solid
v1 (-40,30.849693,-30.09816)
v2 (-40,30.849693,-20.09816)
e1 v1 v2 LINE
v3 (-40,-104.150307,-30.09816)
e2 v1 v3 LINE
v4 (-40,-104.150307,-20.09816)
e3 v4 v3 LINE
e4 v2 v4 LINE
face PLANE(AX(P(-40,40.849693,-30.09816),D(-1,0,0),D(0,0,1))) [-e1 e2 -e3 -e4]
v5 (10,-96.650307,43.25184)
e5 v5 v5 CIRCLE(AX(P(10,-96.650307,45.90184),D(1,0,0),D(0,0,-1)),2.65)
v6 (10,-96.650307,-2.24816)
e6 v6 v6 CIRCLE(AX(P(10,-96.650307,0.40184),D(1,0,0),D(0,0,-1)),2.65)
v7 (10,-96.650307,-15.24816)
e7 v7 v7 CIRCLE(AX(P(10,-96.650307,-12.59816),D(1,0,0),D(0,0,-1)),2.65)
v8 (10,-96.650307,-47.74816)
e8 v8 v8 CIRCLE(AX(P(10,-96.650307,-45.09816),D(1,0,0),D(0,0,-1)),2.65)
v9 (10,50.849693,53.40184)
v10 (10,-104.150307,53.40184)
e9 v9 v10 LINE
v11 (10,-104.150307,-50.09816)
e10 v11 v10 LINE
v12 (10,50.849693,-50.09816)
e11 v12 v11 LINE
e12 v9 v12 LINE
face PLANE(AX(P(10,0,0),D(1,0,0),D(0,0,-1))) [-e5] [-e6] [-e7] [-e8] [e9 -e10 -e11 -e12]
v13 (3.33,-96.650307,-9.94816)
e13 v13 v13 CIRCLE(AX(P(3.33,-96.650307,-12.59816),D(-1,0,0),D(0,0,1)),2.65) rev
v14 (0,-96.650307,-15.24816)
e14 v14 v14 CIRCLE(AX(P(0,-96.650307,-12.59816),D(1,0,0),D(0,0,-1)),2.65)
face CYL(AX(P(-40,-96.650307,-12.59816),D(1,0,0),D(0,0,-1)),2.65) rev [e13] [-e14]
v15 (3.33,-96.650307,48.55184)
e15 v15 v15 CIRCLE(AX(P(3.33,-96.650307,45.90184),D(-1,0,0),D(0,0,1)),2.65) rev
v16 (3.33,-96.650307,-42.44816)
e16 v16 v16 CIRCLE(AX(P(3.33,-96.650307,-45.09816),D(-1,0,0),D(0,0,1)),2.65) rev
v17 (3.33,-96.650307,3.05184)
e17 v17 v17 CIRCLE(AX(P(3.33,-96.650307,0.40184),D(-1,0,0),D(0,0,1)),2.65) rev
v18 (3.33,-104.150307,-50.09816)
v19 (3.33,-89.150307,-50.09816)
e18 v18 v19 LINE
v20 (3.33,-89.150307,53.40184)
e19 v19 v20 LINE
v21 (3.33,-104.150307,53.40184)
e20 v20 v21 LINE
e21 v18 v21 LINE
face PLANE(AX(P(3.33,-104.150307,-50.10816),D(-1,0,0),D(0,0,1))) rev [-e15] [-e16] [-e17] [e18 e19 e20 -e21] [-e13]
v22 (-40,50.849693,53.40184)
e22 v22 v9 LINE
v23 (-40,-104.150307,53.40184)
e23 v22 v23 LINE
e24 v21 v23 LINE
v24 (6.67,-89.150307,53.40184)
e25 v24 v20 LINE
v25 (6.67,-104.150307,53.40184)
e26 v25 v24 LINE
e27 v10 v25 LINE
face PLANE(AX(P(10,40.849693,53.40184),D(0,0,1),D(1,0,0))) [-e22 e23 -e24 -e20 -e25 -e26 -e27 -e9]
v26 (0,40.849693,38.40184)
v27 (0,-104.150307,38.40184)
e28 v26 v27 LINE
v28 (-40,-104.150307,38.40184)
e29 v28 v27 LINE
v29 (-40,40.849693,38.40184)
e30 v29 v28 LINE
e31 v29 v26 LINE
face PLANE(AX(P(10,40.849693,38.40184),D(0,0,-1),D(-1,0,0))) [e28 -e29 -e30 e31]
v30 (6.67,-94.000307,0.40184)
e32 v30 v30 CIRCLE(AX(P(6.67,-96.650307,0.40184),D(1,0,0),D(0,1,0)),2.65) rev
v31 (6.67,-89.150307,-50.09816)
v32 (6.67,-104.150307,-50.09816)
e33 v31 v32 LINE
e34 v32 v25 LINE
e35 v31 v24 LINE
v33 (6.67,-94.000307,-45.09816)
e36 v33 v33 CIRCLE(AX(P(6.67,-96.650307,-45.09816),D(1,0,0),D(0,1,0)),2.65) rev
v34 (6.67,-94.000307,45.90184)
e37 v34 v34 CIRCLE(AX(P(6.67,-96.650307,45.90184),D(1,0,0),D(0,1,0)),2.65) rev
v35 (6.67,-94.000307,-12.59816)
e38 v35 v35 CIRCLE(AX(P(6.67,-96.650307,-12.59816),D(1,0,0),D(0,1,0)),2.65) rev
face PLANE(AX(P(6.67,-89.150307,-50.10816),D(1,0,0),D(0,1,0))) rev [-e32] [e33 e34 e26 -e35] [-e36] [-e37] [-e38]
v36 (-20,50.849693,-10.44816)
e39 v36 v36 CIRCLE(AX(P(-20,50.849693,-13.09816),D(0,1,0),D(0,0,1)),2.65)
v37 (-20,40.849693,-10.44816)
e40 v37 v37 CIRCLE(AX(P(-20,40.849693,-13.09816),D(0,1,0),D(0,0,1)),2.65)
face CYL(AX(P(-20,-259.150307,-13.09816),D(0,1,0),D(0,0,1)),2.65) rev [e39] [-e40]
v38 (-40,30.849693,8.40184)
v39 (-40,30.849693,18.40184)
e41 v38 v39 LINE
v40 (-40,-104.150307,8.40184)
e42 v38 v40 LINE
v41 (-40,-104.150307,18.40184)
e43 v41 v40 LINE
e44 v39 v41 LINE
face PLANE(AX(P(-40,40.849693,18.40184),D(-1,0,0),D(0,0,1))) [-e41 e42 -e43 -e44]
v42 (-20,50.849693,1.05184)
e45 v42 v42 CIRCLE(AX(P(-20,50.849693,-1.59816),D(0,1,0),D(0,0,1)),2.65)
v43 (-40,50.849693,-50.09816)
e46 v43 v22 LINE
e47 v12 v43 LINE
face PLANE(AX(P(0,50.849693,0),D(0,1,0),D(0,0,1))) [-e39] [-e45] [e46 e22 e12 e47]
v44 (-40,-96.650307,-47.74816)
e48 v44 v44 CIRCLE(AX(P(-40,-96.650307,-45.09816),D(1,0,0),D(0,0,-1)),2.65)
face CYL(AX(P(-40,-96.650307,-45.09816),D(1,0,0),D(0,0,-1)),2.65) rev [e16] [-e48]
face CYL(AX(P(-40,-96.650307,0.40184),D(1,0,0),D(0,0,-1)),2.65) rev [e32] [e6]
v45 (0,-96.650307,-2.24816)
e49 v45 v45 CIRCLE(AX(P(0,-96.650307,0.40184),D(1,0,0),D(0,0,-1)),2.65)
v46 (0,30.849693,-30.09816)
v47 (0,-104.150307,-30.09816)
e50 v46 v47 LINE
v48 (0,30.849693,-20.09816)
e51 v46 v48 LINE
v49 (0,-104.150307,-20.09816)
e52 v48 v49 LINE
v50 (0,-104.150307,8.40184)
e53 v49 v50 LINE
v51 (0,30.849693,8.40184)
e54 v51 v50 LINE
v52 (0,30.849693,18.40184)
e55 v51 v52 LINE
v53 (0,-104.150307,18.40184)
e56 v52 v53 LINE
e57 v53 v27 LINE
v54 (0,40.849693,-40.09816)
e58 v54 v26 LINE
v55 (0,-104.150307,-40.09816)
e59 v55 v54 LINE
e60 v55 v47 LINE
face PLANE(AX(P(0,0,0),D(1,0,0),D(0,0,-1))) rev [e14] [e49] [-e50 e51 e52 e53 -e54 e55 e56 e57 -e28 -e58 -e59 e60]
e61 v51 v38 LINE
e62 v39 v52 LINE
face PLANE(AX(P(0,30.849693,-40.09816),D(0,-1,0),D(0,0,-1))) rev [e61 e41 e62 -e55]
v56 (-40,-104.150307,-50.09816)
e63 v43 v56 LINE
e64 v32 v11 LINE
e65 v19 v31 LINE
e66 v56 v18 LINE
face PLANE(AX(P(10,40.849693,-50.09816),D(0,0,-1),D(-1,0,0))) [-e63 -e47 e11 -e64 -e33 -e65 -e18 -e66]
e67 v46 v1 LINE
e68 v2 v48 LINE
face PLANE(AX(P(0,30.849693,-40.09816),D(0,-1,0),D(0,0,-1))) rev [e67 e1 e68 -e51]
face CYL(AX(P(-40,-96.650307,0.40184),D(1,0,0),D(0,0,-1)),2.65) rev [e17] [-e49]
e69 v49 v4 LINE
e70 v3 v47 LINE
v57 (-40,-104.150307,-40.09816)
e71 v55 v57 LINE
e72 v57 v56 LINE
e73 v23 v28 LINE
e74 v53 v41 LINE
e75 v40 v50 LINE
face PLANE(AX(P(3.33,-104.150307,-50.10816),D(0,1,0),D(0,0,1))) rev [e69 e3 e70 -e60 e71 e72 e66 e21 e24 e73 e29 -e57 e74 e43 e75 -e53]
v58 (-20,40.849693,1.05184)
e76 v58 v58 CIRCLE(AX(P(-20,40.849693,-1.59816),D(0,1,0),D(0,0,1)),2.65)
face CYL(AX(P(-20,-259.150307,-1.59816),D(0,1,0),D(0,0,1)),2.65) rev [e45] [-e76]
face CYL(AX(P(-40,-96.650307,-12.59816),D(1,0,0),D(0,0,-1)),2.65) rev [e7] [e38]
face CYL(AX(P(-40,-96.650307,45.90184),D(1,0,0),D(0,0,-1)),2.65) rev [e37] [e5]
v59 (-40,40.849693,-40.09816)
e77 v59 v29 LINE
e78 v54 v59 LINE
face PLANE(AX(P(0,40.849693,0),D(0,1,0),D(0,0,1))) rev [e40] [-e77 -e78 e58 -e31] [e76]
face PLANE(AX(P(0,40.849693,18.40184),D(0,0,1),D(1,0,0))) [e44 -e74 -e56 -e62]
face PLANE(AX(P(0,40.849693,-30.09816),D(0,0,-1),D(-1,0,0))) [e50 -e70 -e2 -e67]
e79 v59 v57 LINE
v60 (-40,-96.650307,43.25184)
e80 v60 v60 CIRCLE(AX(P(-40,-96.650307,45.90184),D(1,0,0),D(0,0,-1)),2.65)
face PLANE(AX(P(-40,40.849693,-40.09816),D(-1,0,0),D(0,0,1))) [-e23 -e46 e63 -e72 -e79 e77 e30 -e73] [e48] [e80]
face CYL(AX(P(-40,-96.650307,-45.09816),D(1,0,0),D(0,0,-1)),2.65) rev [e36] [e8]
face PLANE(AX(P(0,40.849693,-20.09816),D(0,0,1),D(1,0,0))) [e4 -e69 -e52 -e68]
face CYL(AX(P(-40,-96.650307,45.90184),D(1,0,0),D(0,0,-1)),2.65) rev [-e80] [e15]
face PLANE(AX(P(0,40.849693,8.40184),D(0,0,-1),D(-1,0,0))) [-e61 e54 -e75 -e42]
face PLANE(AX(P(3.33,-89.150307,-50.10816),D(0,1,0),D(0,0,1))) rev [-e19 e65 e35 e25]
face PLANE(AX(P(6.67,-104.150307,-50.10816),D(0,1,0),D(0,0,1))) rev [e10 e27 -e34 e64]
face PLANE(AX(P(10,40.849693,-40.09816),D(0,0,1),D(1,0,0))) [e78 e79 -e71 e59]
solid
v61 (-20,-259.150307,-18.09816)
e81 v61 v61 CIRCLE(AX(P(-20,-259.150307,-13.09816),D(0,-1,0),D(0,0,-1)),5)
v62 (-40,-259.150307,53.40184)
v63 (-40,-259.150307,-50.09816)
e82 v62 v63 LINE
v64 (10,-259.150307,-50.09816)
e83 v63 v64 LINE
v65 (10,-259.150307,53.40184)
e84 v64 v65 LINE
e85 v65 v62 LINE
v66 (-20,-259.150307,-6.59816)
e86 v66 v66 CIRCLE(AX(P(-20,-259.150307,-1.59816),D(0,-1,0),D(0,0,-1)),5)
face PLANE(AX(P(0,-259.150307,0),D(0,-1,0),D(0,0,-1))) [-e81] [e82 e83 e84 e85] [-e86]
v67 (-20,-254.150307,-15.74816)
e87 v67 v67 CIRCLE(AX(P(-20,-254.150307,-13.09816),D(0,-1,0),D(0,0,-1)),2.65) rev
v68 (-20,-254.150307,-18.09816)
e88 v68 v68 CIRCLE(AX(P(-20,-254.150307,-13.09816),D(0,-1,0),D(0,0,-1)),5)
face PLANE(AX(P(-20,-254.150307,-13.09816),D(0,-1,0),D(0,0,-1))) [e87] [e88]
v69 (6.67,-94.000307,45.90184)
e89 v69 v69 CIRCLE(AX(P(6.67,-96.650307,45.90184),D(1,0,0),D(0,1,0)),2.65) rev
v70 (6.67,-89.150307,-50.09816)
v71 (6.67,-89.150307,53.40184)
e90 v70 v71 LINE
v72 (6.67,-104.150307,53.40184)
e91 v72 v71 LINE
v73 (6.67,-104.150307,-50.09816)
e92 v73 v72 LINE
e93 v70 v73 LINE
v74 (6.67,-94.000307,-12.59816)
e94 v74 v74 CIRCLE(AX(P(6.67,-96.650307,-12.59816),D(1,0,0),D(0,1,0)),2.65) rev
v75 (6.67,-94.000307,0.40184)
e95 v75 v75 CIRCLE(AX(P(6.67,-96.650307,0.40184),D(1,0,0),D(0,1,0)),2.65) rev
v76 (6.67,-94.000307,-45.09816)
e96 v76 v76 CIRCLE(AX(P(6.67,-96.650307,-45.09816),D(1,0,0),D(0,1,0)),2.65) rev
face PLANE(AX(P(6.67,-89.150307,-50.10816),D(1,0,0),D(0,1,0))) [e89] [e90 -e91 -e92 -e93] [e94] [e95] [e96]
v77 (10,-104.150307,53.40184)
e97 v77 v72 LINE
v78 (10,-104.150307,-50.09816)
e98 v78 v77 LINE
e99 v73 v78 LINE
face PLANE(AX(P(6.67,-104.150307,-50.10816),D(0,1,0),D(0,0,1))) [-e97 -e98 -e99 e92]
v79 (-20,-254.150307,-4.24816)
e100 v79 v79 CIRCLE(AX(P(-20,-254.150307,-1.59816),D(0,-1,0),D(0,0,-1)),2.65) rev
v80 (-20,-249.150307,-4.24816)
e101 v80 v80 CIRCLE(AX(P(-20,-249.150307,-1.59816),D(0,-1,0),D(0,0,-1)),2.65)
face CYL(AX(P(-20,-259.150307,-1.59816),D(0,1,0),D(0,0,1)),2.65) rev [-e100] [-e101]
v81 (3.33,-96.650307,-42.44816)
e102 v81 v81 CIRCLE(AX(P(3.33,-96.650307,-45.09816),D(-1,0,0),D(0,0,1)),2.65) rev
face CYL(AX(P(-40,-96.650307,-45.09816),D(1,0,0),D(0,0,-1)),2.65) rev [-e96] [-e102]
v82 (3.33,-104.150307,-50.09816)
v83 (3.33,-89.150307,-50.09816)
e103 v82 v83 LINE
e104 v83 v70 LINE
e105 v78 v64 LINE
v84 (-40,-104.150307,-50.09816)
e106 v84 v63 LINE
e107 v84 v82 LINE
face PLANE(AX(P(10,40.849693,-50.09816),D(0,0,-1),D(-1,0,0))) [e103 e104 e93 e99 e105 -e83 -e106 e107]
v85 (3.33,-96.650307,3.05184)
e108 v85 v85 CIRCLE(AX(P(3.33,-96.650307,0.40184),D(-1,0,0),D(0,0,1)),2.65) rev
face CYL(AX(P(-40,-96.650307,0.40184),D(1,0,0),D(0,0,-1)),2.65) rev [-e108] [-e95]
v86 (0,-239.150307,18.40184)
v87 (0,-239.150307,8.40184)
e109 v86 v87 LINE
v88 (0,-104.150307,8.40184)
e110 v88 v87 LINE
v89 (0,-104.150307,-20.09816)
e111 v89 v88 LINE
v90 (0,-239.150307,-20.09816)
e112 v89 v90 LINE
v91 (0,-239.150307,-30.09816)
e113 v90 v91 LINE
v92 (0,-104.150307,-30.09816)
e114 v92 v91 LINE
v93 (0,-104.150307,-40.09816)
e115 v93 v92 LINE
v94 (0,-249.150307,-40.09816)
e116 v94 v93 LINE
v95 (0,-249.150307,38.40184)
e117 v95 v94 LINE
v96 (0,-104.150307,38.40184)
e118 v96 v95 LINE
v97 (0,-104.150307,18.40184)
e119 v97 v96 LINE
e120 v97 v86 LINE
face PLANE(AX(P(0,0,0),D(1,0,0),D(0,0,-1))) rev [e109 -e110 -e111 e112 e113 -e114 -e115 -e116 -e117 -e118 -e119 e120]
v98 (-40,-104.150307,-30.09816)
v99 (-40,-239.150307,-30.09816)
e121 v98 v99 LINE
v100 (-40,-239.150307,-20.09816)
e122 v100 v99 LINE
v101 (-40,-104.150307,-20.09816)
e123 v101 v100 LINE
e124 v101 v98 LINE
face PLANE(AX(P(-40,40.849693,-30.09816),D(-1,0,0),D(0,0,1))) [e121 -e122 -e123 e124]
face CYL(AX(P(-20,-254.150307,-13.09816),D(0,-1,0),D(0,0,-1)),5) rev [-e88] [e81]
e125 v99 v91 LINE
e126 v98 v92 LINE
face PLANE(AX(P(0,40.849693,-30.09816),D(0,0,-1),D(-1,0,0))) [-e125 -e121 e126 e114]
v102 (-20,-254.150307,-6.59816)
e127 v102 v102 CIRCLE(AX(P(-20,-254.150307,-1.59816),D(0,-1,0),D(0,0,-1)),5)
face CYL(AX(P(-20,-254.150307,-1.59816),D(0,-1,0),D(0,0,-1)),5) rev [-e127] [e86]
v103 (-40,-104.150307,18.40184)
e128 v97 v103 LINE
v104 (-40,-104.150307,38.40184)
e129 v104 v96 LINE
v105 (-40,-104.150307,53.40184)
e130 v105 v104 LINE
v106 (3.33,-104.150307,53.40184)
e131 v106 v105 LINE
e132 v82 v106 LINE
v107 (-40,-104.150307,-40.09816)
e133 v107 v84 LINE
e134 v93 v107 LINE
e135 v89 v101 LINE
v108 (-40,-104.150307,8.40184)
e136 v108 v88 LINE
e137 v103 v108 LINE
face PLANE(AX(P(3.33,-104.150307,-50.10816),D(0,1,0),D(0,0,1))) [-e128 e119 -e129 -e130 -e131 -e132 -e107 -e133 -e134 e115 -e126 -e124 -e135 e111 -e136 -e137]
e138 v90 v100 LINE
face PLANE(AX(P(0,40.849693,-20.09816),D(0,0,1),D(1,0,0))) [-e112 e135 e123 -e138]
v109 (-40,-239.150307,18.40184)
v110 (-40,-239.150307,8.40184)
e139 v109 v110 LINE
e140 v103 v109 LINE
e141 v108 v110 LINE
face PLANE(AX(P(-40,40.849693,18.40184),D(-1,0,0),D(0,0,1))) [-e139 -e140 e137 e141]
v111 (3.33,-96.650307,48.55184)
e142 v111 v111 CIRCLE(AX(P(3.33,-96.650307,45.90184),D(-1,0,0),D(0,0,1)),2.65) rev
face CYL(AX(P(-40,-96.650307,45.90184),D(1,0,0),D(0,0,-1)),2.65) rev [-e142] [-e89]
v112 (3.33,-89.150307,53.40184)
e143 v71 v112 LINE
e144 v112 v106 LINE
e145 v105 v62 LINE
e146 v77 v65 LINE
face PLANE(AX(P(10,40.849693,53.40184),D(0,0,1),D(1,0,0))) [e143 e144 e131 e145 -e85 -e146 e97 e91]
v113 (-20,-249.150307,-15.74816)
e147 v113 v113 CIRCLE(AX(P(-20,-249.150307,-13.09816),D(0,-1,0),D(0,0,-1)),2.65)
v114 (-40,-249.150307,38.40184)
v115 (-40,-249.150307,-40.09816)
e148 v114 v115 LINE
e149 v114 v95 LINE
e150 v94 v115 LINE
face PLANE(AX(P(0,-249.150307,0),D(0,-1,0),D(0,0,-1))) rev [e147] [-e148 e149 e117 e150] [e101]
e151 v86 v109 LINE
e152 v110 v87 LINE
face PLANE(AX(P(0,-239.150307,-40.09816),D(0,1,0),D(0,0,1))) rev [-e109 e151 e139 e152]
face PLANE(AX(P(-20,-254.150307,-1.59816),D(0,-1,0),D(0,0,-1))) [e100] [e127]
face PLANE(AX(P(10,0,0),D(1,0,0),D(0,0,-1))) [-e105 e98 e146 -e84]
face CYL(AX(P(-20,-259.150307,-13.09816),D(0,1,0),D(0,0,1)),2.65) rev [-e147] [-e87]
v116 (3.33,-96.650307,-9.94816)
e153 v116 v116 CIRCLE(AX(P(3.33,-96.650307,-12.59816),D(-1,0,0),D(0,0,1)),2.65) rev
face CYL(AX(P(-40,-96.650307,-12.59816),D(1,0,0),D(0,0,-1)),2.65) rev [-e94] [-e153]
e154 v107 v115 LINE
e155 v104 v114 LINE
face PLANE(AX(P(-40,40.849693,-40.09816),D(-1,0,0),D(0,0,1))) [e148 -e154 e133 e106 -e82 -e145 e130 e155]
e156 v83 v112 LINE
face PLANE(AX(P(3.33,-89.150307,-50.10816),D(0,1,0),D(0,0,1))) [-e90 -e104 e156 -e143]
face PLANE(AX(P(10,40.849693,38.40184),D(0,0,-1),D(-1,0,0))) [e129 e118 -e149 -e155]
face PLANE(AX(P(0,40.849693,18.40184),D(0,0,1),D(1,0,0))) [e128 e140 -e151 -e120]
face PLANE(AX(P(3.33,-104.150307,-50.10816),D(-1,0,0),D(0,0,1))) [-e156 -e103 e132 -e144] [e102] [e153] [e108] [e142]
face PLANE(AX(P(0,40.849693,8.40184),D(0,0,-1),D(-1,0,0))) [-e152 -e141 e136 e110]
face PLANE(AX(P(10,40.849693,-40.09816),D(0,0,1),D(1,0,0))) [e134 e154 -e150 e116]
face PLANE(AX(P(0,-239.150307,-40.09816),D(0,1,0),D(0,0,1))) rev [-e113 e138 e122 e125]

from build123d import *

# Parameters (mm, degrees)
SKETCH1_W               = 69
SKETCH1_H               = 280
BOSS_EXTRUDE1_DEPTH     = 10
CUT_EXTRUDE1_DEPTH      = 243.372314788
CUT_EXTRUDE1_DEPTH_BACK = 243.372314788
SKETCH2_W               = 2.5
SKETCH2_H               = 280
SKETCH3_W               = 10
SKETCH3_H               = 280
SKETCH3_W_2             = 2
BOSS_EXTRUDE2_DEPTH     = 10
SKETCH4_W               = 10
SKETCH4_H               = 78.5
BOSS_EXTRUDE3_DEPTH     = 10
SKETCH5_W               = 50
SKETCH5_H               = 10
SKETCH5_H_2             = 15
SKETCH5_W_2             = 40
BOSS_EXTRUDE4_DEPTH     = 290
SKETCH6_W               = 78.5
SKETCH6_H               = 10
CUT_EXTRUDE3_DEPTH      = 40
SKETCH7_W               = 50
SKETCH7_H               = 103.5
BOSS_EXTRUDE5_DEPTH     = 10
SKETCH8_W               = 50
SKETCH8_H               = 103.5
BOSS_EXTRUDE6_DEPTH     = 10
CUT_EXTRUDE5_DEPTH      = 270.277994006
CUT_EXTRUDE5_DEPTH_BACK = 270.277994006
SKETCH12_R              = 2.65
SPLIT1_START            = -40
SPLIT1_OUTLINE_W        = 120
SPLIT1_OUTLINE_H        = 10
SPLIT1_DEPTH            = 50
SPLIT1_2_DEPTH          = 10
SPLIT1_3_OUTLINE_W      = 15
SPLIT1_3_OUTLINE_H      = 10
SPLIT1_3_OUTLINE_R      = 2.65
SPLIT1_3_OUTLINE_H_2    = 15
SPLIT1_3_DEPTH          = 43.33
SPLIT1_START_2          = 6.67
SPLIT1_4_OUTLINE_W      = 15
SPLIT1_4_OUTLINE_H      = 103.5
SPLIT1_4_OUTLINE_R      = 2.65
SPLIT1_4_DEPTH          = 3.33
SPLIT1_5_OUTLINE_W      = 15
SPLIT1_5_OUTLINE_H      = 10
SPLIT1_5_OUTLINE_H_2    = 28.5
SPLIT1_5_OUTLINE_R      = 2.65
SPLIT1_5_OUTLINE_H_3    = 20
SPLIT1_5_DEPTH          = 3.33
SPLIT1_6_OUTLINE_W      = 140
SPLIT1_6_OUTLINE_H      = 103.5
SPLIT1_6_DEPTH          = 50
SPLIT1_7_OUTLINE_W      = 15
SPLIT1_7_OUTLINE_H      = 103.5
SPLIT1_7_OUTLINE_R      = 2.65
SPLIT1_7_DEPTH          = 43.33
SPLIT1_8_OUTLINE_W      = 15
SPLIT1_8_OUTLINE_H      = 103.5
SPLIT1_8_OUTLINE_R      = 2.65
SPLIT1_8_DEPTH          = 3.33
CUT_EXTRUDE6_DEPTH      = 318.098969673
CUT_EXTRUDE6_DEPTH_BACK = 318.098969673
SKETCH13_R              = 2.65
SKETCH15_R              = 5
CUT_EXTRUDE7_DEPTH      = 5


# Read off the part's stored shape, not the designer's step: Split1
with BuildPart() as part:
    # Sketch1 → Boss-Extrude1 (new body)
    with BuildSketch(Plane(origin=(0, 0, 0), x_dir=(0, 0, -1), z_dir=(1, 0, 0))):
        with Locations((3.598159509, -99.150306748)):
            Rectangle(SKETCH1_W, SKETCH1_H)
    extrude(amount=BOSS_EXTRUDE1_DEPTH)

    # Sketch2 → Cut-Extrude1 (cut, two sides: drawn at the far end of the back side and taken through both)
    with BuildSketch(Plane(origin=(10, 0, 0), x_dir=(0, 0, -1), z_dir=(1, 0, 0)).offset(-CUT_EXTRUDE1_DEPTH_BACK)):
        with Locations((-29.651840491, -99.150306748)):
            Rectangle(SKETCH2_W, SKETCH2_H)
    extrude(amount=CUT_EXTRUDE1_DEPTH + CUT_EXTRUDE1_DEPTH_BACK, mode=Mode.SUBTRACT)

    # Sketch3 → Boss-Extrude2 (add)
    with BuildSketch(Plane(origin=(10, 0, 0), x_dir=(0, 0, -1), z_dir=(1, 0, 0))):
        with Locations((-33.401840491, -99.150306748)):
            Rectangle(SKETCH3_W, SKETCH3_H)
        with Locations((39.098159509, -99.150306748)):
            Rectangle(SKETCH3_W_2, SKETCH3_H)
    extrude(amount=-BOSS_EXTRUDE2_DEPTH)

    # Sketch4 → Boss-Extrude3 (add)
    with BuildSketch(Plane.XZ.offset(239.150306748)):
        with Locations((5, -0.848159509)):
            Rectangle(SKETCH4_W, SKETCH4_H)
    extrude(amount=BOSS_EXTRUDE3_DEPTH)

    # Sketch5 → Boss-Extrude4 (add)
    with BuildSketch(Plane.XZ.offset(249.150306748)):
        with Locations((-15, -45.098159509)):
            Rectangle(SKETCH5_W, SKETCH5_H)
        with Locations((-15, 45.901840491)):
            Rectangle(SKETCH5_W, SKETCH5_H_2)
        with Locations((-20, 13.401840491)):
            Rectangle(SKETCH5_W_2, SKETCH5_H)
        with Locations((-20, -25.098159509)):
            Rectangle(SKETCH5_W_2, SKETCH5_H)
    extrude(amount=-BOSS_EXTRUDE4_DEPTH)

    # Sketch6 → Cut-Extrude3 (cut)
    with BuildSketch(Plane.ZY.offset(40)):
        with Locations((-0.848159509, 35.849693252)):
            Rectangle(SKETCH6_W, SKETCH6_H)
        with Locations((-0.848159509, -244.150306748)):
            Rectangle(SKETCH6_W, SKETCH6_H)
    extrude(amount=-CUT_EXTRUDE3_DEPTH, mode=Mode.SUBTRACT)

    # Sketch7 → Boss-Extrude5 (add)
    with BuildSketch(Plane(origin=(0, 40.849693252, 0), x_dir=(1, 0, 0), z_dir=(0, 1, 0))):
        with Locations((-15, -1.651840491)):
            Rectangle(SKETCH7_W, SKETCH7_H)
    extrude(amount=BOSS_EXTRUDE5_DEPTH)

    # Sketch8 → Boss-Extrude6 (add)
    with BuildSketch(Plane.XZ.offset(249.150306748)):
        with Locations((-15, 1.651840491)):
            Rectangle(SKETCH8_W, SKETCH8_H)
    extrude(amount=BOSS_EXTRUDE6_DEPTH)

    # Sketch12 → Cut-Extrude5 (cut, two sides: drawn at the far end of the back side and taken through both)
    with BuildSketch(Plane(origin=(10, 0, 0), x_dir=(0, 0, -1), z_dir=(1, 0, 0)).offset(-CUT_EXTRUDE5_DEPTH_BACK)):
        with Locations((-45.901840491, -96.650306748)):
            Circle(SKETCH12_R)
        with Locations((45.098159509, -96.650306748)):
            Circle(SKETCH12_R)
        with Locations((-0.401840491, -96.650306748)):
            Circle(SKETCH12_R)
        with Locations((12.598159509, -96.650306748)):
            Circle(SKETCH12_R)
    extrude(amount=CUT_EXTRUDE5_DEPTH + CUT_EXTRUDE5_DEPTH_BACK, mode=Mode.SUBTRACT)

    # Split1 6 outline → Split1 6 (cut)
    with BuildSketch(Plane.YZ.offset(SPLIT1_START)):
        with Locations((-19.150306748, 1.651840491)):
            Rectangle(SPLIT1_6_OUTLINE_W, SPLIT1_6_OUTLINE_H)
    extrude(amount=SPLIT1_6_DEPTH, mode=Mode.SUBTRACT)

    # Split1 7 outline → Split1 7 (cut)
    with BuildSketch(Plane.YZ.offset(SPLIT1_START)):
        with Locations((-96.650306748, 1.651840491)):
            Rectangle(SPLIT1_7_OUTLINE_W, SPLIT1_7_OUTLINE_H)
        with Locations((-96.650306748, -45.098159509)):
            Circle(SPLIT1_7_OUTLINE_R, mode=Mode.SUBTRACT)
        with Locations((-96.650306748, 0.401840491)):
            Circle(SPLIT1_7_OUTLINE_R, mode=Mode.SUBTRACT)
        with Locations((-96.650306748, -12.598159509)):
            Circle(SPLIT1_7_OUTLINE_R, mode=Mode.SUBTRACT)
        with Locations((-96.650306748, 45.901840491)):
            Circle(SPLIT1_7_OUTLINE_R, mode=Mode.SUBTRACT)
    extrude(amount=SPLIT1_7_DEPTH, mode=Mode.SUBTRACT)

    # Split1 8 outline → Split1 8 (cut)
    with BuildSketch(Plane.YZ.offset(SPLIT1_START_2)):
        with Locations((-96.650306748, 1.651840491)):
            Rectangle(SPLIT1_8_OUTLINE_W, SPLIT1_8_OUTLINE_H)
        with Locations((-96.650306748, -45.098159509)):
            Circle(SPLIT1_8_OUTLINE_R, mode=Mode.SUBTRACT)
        with Locations((-96.650306748, 0.401840491)):
            Circle(SPLIT1_8_OUTLINE_R, mode=Mode.SUBTRACT)
        with Locations((-96.650306748, -12.598159509)):
            Circle(SPLIT1_8_OUTLINE_R, mode=Mode.SUBTRACT)
        with Locations((-96.650306748, 45.901840491)):
            Circle(SPLIT1_8_OUTLINE_R, mode=Mode.SUBTRACT)
    extrude(amount=SPLIT1_8_DEPTH, mode=Mode.SUBTRACT)


with BuildPart() as body_2:
    # Split1 outline → Split1 (new body)
    with BuildSketch(Plane.YZ.offset(SPLIT1_START)):
        Polygon((-89.150306748, -40.098159509), (-89.150306748, -50.098159509), (50.849693252, -50.098159509), (50.849693252, 53.401840491), (-89.150306748, 53.401840491), (-89.150306748, 38.401840491), (40.849693252, 38.401840491), (40.849693252, -40.098159509), align=None)
        with Locations((-29.150306748, -25.098159509)):
            Rectangle(SPLIT1_OUTLINE_W, SPLIT1_OUTLINE_H)
        with Locations((-29.150306748, 13.401840491)):
            Rectangle(SPLIT1_OUTLINE_W, SPLIT1_OUTLINE_H)
    extrude(amount=SPLIT1_DEPTH)

    # Split1 2 outline → Split1 2 (add)
    with BuildSketch(Plane.YZ):
        Polygon((-89.150306748, -30.098159509), (-89.150306748, -40.098159509), (40.849693252, -40.098159509), (40.849693252, 38.401840491), (-89.150306748, 38.401840491), (-89.150306748, 18.401840491), (30.849693252, 18.401840491), (30.849693252, 8.401840491), (-89.150306748, 8.401840491), (-89.150306748, -20.098159509), (30.849693252, -20.098159509), (30.849693252, -30.098159509), align=None)
    extrude(amount=SPLIT1_2_DEPTH)

    # Split1 3 outline → Split1 3 (add)
    # profile 1 of 4: a face of its own
    with BuildSketch(Plane.YZ.offset(SPLIT1_START)):
        with Locations((-96.650306748, -45.098159509)):
            Rectangle(SPLIT1_3_OUTLINE_W, SPLIT1_3_OUTLINE_H)
        with Locations((-96.650306748, -45.098159509)):
            Circle(SPLIT1_3_OUTLINE_R, mode=Mode.SUBTRACT)
    # profile 2 of 4: a face of its own
    with BuildSketch(Plane.YZ.offset(SPLIT1_START)):
        with Locations((-96.650306748, -25.098159509)):
            Rectangle(SPLIT1_3_OUTLINE_W, SPLIT1_3_OUTLINE_H)
    # profile 3 of 4: a face of its own
    with BuildSketch(Plane.YZ.offset(SPLIT1_START)):
        with Locations((-96.650306748, 13.401840491)):
            Rectangle(SPLIT1_3_OUTLINE_W, SPLIT1_3_OUTLINE_H)
    # profile 4 of 4: a face of its own
    with BuildSketch(Plane.YZ.offset(SPLIT1_START)):
        with Locations((-96.650306748, 45.901840491)):
            Rectangle(SPLIT1_3_OUTLINE_W, SPLIT1_3_OUTLINE_H_2)
        with Locations((-96.650306748, 45.901840491)):
            Circle(SPLIT1_3_OUTLINE_R, mode=Mode.SUBTRACT)
    extrude(amount=SPLIT1_3_DEPTH)

    # Split1 4 outline → Split1 4 (add)
    with BuildSketch(Plane.YZ.offset(SPLIT1_START_2)):
        with Locations((-96.650306748, 1.651840491)):
            Rectangle(SPLIT1_4_OUTLINE_W, SPLIT1_4_OUTLINE_H)
        with Locations((-96.650306748, -45.098159509)):
            Circle(SPLIT1_4_OUTLINE_R, mode=Mode.SUBTRACT)
        with Locations((-96.650306748, 0.401840491)):
            Circle(SPLIT1_4_OUTLINE_R, mode=Mode.SUBTRACT)
        with Locations((-96.650306748, -12.598159509)):
            Circle(SPLIT1_4_OUTLINE_R, mode=Mode.SUBTRACT)
        with Locations((-96.650306748, 45.901840491)):
            Circle(SPLIT1_4_OUTLINE_R, mode=Mode.SUBTRACT)
    extrude(amount=SPLIT1_4_DEPTH)

    # Split1 5 outline → Split1 5 (add)
    # profile 1 of 3: a face of its own
    with BuildSketch(Plane.YZ):
        with Locations((-96.650306748, -35.098159509)):
            Rectangle(SPLIT1_5_OUTLINE_W, SPLIT1_5_OUTLINE_H)
    # profile 2 of 3: a face of its own
    with BuildSketch(Plane.YZ):
        with Locations((-96.650306748, -5.848159509)):
            Rectangle(SPLIT1_5_OUTLINE_W, SPLIT1_5_OUTLINE_H_2)
        with Locations((-96.650306748, -12.598159509)):
            Circle(SPLIT1_5_OUTLINE_R, mode=Mode.SUBTRACT)
        with Locations((-96.650306748, 0.401840491)):
            Circle(SPLIT1_5_OUTLINE_R, mode=Mode.SUBTRACT)
    # profile 3 of 3: a face of its own
    with BuildSketch(Plane.YZ):
        with Locations((-96.650306748, 28.401840491)):
            Rectangle(SPLIT1_5_OUTLINE_W, SPLIT1_5_OUTLINE_H_3)
    extrude(amount=SPLIT1_5_DEPTH)


with BuildPart() as cut_extrude6_tool:
    # Sketch13 → Cut-Extrude6 (new, two sides: drawn at the far end of the back side and taken through both)
    with BuildSketch(Plane(origin=(0, 50.849693252, 0), x_dir=(1, 0, 0), z_dir=(0, 1, 0)).offset(-CUT_EXTRUDE6_DEPTH_BACK)):
        with Locations(Location((-20, 13.098159509, 0), (0, 0, 270))):
            Circle(SKETCH13_R)
        with Locations(Location((-20, 1.598159509, 0), (0, 0, 270))):
            Circle(SKETCH13_R)
    extrude(amount=CUT_EXTRUDE6_DEPTH + CUT_EXTRUDE6_DEPTH_BACK)


with BuildPart() as part_1:
    add(part.part)

    # Cut-Extrude6: cut by cut_extrude6_tool
    add(cut_extrude6_tool.part, mode=Mode.SUBTRACT)

    # Sketch15 → Cut-Extrude7 (cut)
    with BuildSketch(Plane.XZ.offset(259.150306748)):
        with Locations(Location((-20, -1.598159509, 0), (0, 0, 270))):
            Circle(SKETCH15_R)
        with Locations(Location((-20, -13.098159509, 0), (0, 0, 270))):
            Circle(SKETCH15_R)
    extrude(amount=-CUT_EXTRUDE7_DEPTH, mode=Mode.SUBTRACT)


with BuildPart() as body_2_1:
    add(body_2.part)

    # Cut-Extrude6: cut by cut_extrude6_tool
    add(cut_extrude6_tool.part, mode=Mode.SUBTRACT)


solid = Compound([part_1.part, body_2_1.part])
